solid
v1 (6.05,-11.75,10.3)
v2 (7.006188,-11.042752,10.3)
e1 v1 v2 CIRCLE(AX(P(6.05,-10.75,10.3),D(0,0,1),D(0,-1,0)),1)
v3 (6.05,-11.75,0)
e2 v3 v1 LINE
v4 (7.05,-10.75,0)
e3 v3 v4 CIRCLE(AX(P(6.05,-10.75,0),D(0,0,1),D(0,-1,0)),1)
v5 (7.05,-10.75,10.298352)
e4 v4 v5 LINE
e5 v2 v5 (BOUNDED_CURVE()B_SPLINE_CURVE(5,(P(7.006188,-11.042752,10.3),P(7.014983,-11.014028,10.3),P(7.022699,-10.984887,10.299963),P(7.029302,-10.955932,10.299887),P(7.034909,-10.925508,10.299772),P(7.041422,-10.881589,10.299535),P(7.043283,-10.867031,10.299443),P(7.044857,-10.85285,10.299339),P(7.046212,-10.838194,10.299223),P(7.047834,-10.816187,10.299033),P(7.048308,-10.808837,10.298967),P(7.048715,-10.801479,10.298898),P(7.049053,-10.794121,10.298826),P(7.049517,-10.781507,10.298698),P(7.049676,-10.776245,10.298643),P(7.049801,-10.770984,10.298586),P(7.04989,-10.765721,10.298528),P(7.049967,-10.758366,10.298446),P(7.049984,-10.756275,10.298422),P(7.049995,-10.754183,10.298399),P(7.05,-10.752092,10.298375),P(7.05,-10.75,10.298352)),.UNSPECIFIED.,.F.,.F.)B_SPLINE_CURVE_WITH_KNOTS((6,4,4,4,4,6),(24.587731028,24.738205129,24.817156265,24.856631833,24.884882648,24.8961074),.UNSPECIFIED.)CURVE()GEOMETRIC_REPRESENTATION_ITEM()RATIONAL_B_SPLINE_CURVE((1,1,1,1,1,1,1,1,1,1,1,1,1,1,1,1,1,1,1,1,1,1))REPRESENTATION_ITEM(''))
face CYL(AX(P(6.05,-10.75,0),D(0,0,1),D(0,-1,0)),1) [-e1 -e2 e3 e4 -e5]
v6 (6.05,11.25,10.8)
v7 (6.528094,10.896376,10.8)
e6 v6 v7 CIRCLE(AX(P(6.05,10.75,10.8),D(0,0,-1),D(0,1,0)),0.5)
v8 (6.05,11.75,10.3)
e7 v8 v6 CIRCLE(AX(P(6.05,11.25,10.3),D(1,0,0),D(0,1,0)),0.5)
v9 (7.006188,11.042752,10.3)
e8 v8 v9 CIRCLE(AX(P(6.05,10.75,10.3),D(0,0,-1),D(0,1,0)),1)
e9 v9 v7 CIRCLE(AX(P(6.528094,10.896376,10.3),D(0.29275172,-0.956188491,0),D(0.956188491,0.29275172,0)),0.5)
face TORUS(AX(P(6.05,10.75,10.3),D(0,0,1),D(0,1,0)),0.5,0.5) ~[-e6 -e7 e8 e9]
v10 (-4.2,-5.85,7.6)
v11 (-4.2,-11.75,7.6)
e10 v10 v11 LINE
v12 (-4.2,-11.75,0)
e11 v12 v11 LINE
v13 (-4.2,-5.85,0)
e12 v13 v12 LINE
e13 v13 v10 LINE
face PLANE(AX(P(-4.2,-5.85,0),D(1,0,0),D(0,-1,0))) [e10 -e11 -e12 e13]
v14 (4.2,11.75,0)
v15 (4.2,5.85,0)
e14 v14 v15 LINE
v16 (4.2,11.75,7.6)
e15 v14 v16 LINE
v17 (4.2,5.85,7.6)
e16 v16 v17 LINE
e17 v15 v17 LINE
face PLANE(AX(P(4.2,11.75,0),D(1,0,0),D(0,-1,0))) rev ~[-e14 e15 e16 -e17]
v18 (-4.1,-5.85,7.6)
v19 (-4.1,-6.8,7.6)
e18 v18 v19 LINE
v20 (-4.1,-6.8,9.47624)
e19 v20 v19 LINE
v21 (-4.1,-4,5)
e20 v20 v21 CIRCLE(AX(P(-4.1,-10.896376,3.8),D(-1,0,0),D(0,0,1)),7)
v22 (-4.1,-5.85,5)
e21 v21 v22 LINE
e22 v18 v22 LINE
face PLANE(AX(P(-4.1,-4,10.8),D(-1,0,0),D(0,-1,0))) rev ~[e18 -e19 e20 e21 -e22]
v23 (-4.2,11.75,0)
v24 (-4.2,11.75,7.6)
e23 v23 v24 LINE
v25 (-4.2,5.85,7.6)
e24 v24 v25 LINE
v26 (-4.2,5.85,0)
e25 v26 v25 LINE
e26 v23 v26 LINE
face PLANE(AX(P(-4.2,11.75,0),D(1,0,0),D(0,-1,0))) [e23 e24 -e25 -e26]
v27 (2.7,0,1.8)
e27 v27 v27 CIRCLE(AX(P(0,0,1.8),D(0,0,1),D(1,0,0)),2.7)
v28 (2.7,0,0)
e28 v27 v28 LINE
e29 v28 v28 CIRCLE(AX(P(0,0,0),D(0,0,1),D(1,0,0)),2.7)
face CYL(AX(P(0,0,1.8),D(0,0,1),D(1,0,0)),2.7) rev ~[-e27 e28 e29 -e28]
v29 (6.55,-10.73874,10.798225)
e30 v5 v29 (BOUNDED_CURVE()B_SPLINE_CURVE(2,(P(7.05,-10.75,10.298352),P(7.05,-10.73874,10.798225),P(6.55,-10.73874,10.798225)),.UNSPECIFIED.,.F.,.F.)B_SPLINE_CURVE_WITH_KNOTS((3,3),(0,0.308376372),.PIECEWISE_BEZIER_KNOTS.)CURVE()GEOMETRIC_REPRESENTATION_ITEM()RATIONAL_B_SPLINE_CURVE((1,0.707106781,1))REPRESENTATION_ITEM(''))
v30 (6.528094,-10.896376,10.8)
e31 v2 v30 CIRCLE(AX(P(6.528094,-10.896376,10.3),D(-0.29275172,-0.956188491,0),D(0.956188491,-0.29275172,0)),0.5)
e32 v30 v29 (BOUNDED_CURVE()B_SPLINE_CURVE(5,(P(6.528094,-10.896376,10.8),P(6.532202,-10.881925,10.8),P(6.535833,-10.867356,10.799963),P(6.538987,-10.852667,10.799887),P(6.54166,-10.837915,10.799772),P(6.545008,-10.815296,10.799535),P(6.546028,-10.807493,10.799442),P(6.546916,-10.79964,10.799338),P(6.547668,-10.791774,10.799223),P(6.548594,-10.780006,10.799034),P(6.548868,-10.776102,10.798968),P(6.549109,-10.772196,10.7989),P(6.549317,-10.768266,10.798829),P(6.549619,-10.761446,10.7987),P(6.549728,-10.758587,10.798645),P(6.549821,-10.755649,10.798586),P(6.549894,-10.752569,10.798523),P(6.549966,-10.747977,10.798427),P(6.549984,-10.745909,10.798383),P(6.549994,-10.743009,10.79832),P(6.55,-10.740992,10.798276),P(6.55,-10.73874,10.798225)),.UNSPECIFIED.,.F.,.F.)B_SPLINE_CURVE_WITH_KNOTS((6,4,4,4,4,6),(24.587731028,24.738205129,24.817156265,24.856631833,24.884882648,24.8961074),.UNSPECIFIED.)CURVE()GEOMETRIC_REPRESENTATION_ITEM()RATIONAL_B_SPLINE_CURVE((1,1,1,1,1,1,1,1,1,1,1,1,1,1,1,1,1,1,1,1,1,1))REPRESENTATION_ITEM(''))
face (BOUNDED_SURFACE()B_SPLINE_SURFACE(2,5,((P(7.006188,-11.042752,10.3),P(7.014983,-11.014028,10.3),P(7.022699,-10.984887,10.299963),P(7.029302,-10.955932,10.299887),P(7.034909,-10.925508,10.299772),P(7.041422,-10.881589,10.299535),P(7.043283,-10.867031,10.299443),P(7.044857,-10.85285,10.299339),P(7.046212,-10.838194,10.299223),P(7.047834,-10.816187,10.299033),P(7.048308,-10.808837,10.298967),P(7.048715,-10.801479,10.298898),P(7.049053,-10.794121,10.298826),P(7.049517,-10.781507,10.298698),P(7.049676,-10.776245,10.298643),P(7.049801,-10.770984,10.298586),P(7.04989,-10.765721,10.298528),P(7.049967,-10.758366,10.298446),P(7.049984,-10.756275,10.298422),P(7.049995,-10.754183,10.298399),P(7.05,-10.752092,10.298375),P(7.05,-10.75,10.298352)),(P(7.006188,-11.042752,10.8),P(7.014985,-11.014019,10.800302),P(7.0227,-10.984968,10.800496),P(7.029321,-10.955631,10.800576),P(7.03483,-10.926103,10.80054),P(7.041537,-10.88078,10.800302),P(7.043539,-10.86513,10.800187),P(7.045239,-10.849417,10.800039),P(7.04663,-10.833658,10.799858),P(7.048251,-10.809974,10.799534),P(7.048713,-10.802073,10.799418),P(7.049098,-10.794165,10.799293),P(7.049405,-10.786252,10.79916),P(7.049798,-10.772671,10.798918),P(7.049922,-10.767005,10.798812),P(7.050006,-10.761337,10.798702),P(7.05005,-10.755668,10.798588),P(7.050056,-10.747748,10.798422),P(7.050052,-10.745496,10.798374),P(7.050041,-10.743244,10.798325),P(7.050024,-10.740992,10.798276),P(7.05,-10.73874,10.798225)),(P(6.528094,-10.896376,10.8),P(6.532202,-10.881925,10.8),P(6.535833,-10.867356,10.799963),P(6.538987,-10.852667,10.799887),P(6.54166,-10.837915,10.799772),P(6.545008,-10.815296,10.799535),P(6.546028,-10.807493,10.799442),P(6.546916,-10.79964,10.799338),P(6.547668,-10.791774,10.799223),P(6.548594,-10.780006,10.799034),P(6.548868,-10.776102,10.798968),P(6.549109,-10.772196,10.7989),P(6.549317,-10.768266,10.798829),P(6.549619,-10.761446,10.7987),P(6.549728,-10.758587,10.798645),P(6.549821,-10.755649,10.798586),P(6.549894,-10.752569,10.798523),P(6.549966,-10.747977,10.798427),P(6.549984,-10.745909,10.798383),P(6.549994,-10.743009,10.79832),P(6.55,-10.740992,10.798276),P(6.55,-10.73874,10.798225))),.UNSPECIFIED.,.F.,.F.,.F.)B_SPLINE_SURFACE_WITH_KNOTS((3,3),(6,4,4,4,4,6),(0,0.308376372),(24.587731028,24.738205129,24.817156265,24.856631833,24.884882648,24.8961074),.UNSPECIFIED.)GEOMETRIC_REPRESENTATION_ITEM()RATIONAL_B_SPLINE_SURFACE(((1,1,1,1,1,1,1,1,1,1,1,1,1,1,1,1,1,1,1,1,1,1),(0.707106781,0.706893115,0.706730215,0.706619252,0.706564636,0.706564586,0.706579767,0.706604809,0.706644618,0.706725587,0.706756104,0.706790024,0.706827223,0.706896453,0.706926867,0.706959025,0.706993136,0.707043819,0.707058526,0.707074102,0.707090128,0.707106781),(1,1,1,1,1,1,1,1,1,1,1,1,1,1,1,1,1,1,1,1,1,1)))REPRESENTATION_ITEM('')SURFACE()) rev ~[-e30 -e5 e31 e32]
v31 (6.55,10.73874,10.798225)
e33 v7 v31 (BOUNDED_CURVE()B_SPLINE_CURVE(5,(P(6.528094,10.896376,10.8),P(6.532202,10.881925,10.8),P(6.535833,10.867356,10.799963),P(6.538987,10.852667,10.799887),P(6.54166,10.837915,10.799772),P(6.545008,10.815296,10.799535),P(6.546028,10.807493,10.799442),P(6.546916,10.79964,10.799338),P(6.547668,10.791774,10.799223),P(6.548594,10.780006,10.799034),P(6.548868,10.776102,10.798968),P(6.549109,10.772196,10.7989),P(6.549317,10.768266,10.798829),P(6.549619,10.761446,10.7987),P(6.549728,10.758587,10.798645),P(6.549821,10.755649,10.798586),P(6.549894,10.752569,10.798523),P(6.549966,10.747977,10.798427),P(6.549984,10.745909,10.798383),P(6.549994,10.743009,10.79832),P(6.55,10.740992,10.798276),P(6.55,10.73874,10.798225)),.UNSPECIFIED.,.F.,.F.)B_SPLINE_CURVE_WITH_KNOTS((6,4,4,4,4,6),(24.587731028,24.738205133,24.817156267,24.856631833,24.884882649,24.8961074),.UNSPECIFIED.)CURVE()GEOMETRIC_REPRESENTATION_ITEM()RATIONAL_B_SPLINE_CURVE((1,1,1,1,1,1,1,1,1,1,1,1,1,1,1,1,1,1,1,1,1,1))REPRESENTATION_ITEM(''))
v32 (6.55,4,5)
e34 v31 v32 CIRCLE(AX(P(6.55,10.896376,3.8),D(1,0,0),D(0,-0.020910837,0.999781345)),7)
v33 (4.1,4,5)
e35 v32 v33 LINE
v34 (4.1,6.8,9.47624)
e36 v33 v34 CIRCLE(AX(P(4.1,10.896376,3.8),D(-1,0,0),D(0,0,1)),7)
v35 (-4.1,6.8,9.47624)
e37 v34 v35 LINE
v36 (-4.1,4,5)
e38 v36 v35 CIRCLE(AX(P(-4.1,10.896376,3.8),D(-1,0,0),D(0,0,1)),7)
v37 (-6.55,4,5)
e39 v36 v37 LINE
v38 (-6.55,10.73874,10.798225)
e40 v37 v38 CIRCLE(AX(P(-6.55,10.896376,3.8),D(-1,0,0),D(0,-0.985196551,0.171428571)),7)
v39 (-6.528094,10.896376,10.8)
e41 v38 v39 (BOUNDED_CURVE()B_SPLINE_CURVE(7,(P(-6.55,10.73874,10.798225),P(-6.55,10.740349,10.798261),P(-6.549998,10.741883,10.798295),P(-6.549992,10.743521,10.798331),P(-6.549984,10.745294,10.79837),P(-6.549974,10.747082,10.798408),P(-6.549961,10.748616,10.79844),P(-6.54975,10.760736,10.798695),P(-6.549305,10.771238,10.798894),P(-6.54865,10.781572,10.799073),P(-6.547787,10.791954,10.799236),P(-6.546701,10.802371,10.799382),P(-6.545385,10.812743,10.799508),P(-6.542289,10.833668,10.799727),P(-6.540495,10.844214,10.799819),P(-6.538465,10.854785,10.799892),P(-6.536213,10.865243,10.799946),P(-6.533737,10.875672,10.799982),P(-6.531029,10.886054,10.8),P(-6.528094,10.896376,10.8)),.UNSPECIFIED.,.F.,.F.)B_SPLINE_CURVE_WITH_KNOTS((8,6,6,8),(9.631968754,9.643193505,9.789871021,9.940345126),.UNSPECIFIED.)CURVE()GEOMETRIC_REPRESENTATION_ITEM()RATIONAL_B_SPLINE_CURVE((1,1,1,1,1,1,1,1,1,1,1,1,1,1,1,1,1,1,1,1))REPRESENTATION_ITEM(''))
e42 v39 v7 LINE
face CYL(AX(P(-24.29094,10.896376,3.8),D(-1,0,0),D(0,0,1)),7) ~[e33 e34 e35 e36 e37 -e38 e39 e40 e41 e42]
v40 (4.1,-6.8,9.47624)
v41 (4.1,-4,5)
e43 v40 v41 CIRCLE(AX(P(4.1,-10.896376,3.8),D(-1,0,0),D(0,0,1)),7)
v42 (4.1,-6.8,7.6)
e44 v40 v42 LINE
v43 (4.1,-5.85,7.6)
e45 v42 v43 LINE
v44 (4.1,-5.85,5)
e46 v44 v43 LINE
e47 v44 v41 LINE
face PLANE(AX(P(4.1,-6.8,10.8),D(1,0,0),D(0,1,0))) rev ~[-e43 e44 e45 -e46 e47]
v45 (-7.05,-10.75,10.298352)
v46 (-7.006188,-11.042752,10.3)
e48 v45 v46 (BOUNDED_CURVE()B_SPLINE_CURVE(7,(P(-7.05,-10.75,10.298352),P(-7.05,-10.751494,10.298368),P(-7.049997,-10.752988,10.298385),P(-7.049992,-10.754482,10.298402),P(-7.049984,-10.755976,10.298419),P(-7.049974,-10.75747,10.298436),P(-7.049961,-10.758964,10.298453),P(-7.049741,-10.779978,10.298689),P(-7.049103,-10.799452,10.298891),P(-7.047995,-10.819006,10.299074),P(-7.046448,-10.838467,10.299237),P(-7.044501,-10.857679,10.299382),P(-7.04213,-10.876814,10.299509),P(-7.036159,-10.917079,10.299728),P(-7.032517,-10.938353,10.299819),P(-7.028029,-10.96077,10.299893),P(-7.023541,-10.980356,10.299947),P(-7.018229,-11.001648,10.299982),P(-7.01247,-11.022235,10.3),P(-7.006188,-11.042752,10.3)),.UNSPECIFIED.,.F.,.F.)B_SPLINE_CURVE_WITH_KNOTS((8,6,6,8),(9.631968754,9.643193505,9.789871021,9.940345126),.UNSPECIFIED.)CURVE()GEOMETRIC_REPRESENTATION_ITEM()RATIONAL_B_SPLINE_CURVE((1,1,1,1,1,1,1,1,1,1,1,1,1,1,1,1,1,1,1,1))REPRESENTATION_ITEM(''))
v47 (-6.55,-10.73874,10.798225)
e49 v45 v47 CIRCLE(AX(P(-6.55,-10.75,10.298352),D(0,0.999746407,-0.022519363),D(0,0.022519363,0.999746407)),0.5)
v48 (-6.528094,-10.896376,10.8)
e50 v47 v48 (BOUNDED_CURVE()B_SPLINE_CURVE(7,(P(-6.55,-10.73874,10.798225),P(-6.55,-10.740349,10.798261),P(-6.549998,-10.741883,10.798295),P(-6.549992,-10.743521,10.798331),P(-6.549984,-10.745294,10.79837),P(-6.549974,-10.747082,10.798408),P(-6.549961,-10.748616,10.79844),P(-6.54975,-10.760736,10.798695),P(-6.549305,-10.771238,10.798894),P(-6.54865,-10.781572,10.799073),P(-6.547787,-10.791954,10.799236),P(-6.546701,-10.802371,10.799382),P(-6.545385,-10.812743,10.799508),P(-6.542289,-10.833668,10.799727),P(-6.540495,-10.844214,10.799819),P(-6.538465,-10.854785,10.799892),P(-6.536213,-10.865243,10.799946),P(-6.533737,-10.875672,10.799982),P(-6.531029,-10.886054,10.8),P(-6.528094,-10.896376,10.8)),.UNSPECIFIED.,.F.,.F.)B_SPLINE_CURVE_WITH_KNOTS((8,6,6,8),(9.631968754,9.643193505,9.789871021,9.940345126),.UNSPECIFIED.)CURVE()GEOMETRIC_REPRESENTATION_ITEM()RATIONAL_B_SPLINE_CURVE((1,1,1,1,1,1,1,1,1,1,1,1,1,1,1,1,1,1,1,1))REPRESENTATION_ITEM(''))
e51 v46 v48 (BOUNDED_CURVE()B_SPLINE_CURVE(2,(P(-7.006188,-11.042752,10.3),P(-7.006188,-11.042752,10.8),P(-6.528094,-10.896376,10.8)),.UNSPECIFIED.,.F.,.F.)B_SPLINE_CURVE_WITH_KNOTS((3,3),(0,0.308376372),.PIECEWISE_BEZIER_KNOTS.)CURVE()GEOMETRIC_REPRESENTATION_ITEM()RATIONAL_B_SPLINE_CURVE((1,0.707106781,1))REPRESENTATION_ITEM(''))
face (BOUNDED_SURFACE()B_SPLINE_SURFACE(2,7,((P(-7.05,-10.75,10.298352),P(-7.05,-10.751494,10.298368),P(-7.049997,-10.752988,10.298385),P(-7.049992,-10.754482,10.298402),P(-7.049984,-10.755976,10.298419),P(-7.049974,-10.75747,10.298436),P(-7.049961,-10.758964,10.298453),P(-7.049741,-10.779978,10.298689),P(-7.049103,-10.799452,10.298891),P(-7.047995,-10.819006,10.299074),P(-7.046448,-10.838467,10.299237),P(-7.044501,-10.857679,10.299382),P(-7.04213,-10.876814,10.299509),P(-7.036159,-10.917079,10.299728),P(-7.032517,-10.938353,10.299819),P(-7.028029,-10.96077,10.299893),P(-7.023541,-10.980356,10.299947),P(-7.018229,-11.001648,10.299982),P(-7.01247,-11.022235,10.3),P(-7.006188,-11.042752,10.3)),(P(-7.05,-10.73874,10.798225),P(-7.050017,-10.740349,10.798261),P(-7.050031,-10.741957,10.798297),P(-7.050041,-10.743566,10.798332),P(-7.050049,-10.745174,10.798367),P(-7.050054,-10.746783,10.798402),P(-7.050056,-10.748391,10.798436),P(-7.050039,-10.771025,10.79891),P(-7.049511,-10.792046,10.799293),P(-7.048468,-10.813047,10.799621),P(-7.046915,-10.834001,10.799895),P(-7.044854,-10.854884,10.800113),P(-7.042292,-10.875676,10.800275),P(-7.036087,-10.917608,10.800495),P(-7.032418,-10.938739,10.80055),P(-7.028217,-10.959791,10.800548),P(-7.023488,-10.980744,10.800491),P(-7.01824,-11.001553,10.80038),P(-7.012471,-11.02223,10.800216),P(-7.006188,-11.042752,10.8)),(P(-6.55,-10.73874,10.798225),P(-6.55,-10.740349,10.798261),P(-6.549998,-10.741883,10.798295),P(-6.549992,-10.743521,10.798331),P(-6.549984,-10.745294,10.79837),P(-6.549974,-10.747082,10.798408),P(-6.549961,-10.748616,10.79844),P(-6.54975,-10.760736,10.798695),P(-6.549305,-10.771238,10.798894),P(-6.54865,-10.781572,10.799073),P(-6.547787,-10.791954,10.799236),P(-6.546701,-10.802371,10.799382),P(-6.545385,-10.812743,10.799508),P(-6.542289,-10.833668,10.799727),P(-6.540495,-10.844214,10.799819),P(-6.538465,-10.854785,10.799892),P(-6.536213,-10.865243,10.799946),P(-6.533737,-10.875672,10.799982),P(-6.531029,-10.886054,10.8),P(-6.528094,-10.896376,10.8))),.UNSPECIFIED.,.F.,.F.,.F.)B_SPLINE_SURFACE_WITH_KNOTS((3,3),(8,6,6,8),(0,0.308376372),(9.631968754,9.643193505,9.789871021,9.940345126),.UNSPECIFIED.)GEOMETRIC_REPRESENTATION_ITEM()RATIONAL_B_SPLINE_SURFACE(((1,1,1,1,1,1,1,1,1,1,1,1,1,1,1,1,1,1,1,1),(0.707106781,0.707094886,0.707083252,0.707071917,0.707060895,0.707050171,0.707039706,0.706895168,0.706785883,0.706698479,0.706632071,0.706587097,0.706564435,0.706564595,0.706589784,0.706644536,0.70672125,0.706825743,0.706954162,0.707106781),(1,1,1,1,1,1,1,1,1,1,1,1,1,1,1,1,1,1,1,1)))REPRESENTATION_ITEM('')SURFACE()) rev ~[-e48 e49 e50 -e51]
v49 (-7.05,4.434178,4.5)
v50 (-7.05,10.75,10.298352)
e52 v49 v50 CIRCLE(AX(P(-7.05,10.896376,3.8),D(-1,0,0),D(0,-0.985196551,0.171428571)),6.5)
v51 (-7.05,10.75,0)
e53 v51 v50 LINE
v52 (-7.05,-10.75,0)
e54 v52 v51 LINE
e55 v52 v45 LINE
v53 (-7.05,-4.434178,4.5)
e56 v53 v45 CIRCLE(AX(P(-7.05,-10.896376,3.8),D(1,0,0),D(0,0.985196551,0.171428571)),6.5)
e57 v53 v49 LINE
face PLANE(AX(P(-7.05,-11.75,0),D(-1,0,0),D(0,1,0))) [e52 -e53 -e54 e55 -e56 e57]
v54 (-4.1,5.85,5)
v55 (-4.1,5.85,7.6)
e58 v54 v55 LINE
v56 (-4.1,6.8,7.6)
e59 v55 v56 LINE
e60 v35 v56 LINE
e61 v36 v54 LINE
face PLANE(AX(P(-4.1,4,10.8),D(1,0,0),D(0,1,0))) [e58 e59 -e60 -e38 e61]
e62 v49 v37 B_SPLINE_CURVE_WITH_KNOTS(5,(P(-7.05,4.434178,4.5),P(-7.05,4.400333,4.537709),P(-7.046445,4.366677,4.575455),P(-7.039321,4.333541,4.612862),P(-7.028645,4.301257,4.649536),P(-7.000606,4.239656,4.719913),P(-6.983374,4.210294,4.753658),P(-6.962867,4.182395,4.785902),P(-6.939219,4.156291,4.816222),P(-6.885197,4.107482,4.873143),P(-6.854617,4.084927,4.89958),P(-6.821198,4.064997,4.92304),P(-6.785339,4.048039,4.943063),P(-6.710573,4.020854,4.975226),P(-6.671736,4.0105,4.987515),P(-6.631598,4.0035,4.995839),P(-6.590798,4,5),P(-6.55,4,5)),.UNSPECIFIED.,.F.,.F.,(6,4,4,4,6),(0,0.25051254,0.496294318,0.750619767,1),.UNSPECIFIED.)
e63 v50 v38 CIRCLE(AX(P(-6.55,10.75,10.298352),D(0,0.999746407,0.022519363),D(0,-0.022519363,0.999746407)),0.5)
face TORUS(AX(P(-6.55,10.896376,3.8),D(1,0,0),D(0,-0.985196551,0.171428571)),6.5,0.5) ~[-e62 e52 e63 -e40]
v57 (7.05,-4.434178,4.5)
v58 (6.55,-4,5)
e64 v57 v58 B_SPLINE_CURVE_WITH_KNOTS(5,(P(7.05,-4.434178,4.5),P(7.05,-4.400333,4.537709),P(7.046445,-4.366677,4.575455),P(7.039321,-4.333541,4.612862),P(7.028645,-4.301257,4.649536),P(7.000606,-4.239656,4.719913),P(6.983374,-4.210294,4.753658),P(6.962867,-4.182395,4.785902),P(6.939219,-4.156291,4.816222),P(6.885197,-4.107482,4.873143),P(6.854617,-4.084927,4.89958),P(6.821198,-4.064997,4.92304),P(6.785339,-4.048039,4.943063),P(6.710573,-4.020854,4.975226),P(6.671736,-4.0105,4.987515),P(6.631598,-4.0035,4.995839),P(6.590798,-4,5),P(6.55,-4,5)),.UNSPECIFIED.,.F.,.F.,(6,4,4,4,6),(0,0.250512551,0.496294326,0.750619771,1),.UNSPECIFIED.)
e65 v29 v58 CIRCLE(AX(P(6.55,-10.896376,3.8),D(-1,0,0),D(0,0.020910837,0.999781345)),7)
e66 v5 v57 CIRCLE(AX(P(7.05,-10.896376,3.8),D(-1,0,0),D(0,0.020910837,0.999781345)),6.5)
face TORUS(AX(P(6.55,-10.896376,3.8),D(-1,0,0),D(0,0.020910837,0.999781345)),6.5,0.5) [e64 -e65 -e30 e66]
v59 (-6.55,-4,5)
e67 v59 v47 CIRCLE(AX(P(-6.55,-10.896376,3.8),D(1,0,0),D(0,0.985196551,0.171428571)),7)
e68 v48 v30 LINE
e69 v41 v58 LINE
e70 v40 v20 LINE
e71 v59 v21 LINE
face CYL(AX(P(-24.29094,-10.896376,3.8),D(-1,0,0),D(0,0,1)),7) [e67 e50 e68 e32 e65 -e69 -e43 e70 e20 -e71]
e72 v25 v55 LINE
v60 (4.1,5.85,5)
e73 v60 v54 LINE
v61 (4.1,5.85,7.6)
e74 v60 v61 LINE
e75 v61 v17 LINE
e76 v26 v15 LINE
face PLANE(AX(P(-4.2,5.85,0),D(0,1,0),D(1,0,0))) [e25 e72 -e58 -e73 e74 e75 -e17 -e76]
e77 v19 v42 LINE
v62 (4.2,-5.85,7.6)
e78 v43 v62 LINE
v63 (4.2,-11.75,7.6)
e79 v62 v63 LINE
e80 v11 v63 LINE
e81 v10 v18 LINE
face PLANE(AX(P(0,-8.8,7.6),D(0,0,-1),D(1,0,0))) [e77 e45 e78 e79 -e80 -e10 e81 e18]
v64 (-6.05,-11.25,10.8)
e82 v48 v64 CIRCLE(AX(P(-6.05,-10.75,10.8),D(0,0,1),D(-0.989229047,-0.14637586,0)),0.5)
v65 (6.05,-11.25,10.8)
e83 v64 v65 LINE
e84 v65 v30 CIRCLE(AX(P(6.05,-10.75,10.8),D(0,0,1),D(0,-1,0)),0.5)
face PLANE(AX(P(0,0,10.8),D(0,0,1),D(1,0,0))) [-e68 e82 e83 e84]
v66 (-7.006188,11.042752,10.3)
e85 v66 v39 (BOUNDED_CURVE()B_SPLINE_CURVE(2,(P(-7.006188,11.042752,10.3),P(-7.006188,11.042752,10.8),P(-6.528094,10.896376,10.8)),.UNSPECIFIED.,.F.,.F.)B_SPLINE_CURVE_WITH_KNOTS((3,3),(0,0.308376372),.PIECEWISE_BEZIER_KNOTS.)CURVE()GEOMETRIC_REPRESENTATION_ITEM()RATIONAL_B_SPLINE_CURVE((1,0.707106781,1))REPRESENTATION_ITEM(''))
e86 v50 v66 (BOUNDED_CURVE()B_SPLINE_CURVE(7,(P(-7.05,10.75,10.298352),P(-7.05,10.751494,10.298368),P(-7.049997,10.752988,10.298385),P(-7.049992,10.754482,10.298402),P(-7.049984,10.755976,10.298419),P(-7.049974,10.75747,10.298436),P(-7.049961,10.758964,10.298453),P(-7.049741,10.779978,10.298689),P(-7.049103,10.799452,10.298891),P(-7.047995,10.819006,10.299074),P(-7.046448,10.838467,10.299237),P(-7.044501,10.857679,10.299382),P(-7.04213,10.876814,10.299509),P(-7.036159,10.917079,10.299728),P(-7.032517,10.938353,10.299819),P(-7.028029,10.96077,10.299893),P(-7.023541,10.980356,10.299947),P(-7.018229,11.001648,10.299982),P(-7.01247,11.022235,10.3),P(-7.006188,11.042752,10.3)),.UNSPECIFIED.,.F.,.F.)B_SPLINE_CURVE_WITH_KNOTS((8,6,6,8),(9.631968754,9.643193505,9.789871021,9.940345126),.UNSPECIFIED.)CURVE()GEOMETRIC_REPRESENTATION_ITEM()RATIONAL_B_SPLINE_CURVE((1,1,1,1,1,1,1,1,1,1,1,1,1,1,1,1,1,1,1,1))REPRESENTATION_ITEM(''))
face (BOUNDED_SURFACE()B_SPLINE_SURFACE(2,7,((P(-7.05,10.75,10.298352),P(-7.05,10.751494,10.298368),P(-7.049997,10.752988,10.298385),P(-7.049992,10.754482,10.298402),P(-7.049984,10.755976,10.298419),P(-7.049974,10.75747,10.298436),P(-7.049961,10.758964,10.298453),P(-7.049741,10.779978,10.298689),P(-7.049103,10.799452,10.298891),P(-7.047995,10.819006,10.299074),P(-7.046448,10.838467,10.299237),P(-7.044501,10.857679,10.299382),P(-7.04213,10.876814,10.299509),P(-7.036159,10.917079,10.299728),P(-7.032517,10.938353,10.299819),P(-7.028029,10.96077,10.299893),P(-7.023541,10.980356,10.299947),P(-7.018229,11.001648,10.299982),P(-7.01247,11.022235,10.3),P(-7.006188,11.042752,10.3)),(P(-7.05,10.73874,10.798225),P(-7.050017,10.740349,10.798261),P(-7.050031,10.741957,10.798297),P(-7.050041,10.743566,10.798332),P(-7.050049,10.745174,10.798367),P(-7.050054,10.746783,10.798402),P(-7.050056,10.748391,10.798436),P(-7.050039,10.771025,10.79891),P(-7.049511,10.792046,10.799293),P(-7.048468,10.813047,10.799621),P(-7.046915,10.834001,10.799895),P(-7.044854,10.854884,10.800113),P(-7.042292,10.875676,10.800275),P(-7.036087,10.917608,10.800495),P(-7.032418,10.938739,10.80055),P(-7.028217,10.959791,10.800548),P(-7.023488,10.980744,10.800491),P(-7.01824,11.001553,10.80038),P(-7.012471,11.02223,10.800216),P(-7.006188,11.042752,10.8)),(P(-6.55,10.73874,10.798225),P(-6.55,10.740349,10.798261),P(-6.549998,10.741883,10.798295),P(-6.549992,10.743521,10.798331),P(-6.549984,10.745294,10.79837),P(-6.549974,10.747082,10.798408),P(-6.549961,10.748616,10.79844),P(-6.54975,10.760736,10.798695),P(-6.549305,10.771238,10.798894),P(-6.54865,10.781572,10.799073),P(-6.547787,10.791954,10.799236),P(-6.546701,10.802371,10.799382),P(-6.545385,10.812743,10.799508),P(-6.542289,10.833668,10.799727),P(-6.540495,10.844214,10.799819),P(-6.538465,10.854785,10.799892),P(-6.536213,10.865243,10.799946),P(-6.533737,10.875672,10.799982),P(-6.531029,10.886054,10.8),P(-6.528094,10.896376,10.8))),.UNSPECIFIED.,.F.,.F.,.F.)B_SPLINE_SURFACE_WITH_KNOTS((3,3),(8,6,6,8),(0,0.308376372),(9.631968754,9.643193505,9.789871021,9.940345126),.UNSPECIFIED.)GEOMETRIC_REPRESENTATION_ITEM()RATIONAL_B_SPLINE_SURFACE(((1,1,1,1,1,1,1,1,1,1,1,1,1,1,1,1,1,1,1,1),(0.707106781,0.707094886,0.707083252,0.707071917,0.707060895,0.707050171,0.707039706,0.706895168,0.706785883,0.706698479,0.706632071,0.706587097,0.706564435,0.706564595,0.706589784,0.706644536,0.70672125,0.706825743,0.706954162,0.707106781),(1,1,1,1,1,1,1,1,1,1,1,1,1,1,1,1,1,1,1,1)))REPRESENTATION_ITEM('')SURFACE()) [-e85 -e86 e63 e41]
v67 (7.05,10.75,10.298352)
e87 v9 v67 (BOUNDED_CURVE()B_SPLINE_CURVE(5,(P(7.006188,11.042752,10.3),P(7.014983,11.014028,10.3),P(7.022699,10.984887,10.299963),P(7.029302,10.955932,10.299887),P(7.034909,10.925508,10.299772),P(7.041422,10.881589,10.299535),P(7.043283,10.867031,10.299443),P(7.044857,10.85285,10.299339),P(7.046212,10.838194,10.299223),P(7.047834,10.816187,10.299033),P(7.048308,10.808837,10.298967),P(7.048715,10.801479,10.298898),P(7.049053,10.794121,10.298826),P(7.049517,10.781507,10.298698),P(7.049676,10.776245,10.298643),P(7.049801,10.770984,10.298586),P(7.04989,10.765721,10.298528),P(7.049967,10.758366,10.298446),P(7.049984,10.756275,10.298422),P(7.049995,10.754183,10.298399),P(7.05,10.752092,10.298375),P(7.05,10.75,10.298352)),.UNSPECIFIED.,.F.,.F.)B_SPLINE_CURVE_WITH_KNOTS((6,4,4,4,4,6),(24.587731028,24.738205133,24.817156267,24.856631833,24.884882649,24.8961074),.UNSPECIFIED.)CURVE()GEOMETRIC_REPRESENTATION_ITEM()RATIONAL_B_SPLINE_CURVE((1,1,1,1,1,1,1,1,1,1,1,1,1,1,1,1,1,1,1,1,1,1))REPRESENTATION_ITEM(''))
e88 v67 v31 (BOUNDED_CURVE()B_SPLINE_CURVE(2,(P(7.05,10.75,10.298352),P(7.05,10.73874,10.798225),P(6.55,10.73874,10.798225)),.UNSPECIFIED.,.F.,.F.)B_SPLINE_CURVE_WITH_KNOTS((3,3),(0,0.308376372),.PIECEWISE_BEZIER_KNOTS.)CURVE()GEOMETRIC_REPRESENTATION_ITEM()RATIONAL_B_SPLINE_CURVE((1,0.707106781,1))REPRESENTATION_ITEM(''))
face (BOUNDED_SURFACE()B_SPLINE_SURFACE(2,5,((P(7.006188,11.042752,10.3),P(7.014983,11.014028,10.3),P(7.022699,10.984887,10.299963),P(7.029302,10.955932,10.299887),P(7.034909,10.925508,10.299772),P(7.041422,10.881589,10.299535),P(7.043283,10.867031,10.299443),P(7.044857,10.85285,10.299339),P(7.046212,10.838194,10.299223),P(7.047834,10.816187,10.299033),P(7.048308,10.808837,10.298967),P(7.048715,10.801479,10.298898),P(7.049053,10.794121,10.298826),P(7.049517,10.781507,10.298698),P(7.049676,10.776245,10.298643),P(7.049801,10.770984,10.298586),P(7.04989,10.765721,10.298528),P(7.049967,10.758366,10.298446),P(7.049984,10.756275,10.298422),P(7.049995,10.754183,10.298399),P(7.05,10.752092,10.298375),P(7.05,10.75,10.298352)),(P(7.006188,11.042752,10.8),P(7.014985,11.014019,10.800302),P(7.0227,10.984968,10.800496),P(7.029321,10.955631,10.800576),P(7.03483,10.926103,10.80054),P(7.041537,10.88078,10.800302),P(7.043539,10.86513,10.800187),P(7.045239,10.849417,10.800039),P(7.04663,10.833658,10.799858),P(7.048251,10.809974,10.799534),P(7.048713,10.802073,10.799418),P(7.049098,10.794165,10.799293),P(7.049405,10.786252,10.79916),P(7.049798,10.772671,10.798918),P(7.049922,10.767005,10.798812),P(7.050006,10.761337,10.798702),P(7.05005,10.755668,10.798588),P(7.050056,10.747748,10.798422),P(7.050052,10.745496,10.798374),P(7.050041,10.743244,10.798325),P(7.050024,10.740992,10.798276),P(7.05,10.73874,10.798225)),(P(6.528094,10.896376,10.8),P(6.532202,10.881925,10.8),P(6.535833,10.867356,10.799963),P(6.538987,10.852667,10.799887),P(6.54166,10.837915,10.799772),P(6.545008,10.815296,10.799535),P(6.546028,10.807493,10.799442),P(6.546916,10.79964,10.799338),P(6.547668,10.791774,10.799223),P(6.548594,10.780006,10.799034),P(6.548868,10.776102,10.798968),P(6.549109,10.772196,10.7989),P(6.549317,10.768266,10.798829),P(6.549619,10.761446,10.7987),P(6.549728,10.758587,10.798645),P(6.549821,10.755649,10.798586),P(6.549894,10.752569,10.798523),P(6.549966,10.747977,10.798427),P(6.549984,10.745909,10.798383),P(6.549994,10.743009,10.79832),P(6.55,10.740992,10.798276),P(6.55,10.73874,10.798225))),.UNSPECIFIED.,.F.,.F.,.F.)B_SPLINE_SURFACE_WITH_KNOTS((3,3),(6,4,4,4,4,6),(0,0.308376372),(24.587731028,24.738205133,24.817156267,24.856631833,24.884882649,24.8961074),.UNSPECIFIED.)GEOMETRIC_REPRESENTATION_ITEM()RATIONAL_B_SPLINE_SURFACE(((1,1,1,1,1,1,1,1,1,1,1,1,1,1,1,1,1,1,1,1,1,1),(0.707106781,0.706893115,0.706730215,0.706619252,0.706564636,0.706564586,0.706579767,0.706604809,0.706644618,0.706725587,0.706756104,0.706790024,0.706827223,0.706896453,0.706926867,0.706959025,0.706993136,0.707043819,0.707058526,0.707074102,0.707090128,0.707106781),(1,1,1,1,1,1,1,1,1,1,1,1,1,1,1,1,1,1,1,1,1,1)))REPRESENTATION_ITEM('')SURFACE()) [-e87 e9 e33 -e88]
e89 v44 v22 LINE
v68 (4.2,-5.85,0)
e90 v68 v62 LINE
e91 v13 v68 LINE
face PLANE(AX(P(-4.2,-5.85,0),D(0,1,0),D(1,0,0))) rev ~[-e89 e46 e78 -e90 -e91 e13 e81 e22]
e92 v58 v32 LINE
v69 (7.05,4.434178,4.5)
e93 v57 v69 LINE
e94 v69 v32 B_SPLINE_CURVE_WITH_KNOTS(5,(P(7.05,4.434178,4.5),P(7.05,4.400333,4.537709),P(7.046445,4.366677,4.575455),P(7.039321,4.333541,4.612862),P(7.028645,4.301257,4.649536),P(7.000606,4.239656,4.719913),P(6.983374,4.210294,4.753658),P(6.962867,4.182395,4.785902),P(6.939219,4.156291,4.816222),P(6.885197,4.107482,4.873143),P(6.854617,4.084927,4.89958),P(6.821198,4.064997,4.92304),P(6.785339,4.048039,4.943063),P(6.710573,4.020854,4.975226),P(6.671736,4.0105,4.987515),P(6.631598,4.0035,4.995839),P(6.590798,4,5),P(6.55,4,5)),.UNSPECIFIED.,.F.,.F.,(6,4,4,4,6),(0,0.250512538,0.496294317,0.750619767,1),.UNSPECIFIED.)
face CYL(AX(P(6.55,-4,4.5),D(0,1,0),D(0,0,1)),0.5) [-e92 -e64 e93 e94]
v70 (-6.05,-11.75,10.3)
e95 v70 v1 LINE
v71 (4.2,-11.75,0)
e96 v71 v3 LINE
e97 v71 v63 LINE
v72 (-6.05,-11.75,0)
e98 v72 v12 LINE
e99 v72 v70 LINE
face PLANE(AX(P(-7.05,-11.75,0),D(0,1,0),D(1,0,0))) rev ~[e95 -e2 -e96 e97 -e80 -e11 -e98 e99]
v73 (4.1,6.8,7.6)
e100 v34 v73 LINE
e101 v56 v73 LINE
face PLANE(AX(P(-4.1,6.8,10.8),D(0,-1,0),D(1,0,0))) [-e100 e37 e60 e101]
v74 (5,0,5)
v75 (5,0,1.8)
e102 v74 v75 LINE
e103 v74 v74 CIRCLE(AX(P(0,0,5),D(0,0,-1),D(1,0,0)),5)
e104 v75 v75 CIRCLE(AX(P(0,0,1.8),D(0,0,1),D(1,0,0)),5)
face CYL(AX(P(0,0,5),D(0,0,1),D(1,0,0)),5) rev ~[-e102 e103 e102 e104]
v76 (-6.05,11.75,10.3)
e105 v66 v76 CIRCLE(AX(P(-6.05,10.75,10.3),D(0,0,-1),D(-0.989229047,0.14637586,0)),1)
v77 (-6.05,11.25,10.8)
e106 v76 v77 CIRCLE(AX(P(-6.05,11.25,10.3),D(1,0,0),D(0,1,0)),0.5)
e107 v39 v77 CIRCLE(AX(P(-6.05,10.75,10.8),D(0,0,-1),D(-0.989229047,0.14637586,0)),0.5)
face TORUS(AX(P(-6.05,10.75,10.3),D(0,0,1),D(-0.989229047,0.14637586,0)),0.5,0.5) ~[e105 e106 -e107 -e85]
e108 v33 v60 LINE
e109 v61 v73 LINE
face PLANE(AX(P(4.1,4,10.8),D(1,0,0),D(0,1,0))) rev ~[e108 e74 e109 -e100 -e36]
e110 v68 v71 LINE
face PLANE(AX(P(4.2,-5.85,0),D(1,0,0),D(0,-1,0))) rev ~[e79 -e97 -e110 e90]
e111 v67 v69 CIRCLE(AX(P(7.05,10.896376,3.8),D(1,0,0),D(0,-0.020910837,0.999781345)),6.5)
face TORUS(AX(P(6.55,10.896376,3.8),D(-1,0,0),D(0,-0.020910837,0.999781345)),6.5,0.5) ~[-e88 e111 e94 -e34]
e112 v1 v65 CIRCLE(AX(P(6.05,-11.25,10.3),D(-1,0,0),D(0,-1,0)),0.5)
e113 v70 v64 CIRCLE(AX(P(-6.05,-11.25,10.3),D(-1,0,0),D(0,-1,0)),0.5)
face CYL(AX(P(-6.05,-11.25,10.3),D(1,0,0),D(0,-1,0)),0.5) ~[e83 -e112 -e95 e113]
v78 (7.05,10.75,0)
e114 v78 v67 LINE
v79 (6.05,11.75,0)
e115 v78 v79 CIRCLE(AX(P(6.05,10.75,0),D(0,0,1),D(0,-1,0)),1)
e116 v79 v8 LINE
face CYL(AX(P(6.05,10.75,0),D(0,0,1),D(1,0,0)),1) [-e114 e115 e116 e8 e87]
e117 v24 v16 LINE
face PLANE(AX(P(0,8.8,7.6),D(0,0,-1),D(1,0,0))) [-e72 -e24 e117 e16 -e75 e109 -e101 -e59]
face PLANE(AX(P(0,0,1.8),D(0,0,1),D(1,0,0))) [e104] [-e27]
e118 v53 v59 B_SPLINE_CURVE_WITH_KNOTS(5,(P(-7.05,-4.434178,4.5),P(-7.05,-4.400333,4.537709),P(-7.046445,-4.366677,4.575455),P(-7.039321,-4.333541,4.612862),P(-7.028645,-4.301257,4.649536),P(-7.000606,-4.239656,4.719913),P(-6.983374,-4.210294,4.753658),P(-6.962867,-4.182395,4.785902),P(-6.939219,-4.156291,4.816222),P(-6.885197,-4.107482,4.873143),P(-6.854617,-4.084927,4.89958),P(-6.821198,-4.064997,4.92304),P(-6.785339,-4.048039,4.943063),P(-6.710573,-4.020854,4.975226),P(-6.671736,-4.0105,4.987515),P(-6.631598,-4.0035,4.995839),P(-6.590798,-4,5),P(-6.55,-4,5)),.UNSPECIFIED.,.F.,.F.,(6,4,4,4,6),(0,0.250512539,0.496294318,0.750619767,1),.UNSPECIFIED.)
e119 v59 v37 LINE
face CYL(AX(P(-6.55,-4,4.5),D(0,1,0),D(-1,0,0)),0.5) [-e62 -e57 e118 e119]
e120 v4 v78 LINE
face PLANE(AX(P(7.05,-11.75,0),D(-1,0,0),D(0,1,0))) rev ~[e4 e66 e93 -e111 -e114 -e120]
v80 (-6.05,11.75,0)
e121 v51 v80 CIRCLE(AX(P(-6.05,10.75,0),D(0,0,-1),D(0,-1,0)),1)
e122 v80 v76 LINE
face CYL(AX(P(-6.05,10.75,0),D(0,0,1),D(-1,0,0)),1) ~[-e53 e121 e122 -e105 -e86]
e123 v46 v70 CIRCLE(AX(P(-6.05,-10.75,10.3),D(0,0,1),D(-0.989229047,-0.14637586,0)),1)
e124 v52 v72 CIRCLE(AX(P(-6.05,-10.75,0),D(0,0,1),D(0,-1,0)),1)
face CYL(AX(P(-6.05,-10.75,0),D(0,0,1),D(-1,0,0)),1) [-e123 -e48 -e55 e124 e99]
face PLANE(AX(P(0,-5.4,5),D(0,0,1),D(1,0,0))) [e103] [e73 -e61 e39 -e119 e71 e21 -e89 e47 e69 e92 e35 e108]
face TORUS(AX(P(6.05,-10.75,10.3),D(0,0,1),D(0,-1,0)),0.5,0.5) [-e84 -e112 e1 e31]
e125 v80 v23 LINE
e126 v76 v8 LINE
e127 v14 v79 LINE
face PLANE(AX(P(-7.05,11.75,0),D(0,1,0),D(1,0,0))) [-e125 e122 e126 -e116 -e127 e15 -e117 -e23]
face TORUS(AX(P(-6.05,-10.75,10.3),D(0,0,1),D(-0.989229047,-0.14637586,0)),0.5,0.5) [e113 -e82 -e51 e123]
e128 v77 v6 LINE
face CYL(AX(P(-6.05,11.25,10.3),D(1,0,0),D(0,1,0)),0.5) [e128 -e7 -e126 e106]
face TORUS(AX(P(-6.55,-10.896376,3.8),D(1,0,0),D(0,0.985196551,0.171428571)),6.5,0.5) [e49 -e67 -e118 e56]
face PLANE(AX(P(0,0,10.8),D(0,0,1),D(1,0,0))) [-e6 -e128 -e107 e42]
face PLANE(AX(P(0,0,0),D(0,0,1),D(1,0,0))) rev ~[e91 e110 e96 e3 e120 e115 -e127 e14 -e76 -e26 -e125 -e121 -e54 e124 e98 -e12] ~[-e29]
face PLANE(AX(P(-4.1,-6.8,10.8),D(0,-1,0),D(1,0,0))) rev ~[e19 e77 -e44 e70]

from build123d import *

# Parameters (mm, degrees)
F0_W         = 14.1
F0_H         = 23.5
F1_DEPTH     = 10.8
F2_W         = 8.2
F2_H         = 2.8
F2_H_2       = 8
F2_W_2       = 2.95
F3_DEPTH     = 5.8
F4_W         = 8.4
F4_H         = 5.9
F5_DEPTH     = 7.6
F6_R         = 5
F7_DEPTH     = 3.2
F8_R         = 2.7
F9_DEPTH     = 1.801
F10_T1_DEPTH = 37.4318792991
F11_R        = 1
F12_R        = 0.5


# Not quite as in the source:
# - a fillet or chamfer that OpenCascade refuses, or shapes differently, is made with other operations: its cross-section is extruded or revolved along the edge and cut away or added


with BuildPart() as f1:
    # F0 (on Top) → F1 (new body)
    with BuildSketch(Plane.XY):
        Rectangle(F0_W, F0_H)
    extrude(amount=F1_DEPTH)

    # F2 (on face) → F3 (cut)
    with BuildSketch(Plane.XY.offset(10.8)):
        with Locations((0, -5.4)):
            Rectangle(F2_W, F2_H)
        Rectangle(F2_W, F2_H_2)
        with Locations((5.575, 0)):
            Rectangle(F2_W_2, F2_H_2)
        with Locations((-5.575, 0)):
            Rectangle(F2_W_2, F2_H_2)
        with Locations((0, 5.4)):
            Rectangle(F2_W, F2_H)
    extrude(amount=-F3_DEPTH, mode=Mode.SUBTRACT)

    # F4 (on face) → F5 (cut)
    with BuildSketch(Plane(origin=(0, 0, 0), x_dir=(1, 0, 0), z_dir=(0, 0, -1))):
        with Locations((0, -8.8)):
            Rectangle(F4_W, F4_H)
        with Locations((0, 8.8)):
            Rectangle(F4_W, F4_H)
    extrude(amount=-F5_DEPTH, mode=Mode.SUBTRACT)

    # F6 (on face) → F7 (cut)
    with BuildSketch(Plane.XY.offset(5)):
        Circle(F6_R)
    extrude(amount=-F7_DEPTH, mode=Mode.SUBTRACT)

    # F8 (on face) → F9 (cut, through all)
    with BuildSketch(Plane.XY.offset(1.8)):
        Circle(F8_R)
    extrude(amount=-F9_DEPTH, mode=Mode.SUBTRACT)

    # F10: fillet of radius 7 on 2 edges, made by hand

    # F10_s2 → F10_t1 (cut)
    with BuildSketch(Plane.YZ.offset(-24.2909396496)):
        with BuildLine():
            ThreePointArc((-10.8963758598, 10.8), (-6.3908237294, 9.1572380944), (-4, 5))
            Line((-4, 5), (-4, 10.8))
            Line((-4, 10.8), (-10.8963758598, 10.8))
        make_face()
        with BuildLine():
            ThreePointArc((10.8963758598, 10.8), (6.3908237294, 9.1572380944), (4, 5))
            Line((4, 5), (4, 10.8))
            Line((4, 10.8), (10.8963758598, 10.8))
        make_face()
    extrude(amount=F10_T1_DEPTH, mode=Mode.SUBTRACT)

    # F11
    f11_edges = [f1.edges().sort_by_distance(p)[0] for p in [
        (7.05, -11.75, 5.4),
        (-7.05, -11.75, 5.4),
        (7.05, 11.75, 5.4),
        (-7.05, 11.75, 5.4),
    ]]
    fillet(f11_edges, radius=F11_R)

    # F12
    f12_edges = [f1.edges().sort_by_distance(p)[0] for p in [
        (0, 11.75, 10.8),
        (0, -11.75, 10.8),
        (-7.05, 0, 5),
        (7.05, 0, 5),
        (7.05, -6.335055, 9.109835),
        (7.05, 6.335055, 9.109835),
        (7.047304, -10.823382, 10.79962),
        (6.703309, -11.507092, 10.8),
        (7.047304, 10.823382, 10.79962),
        (6.703309, 11.507092, 10.8),
        (-7.05, -6.335055, 9.109835),
        (-7.047304, -10.823382, 10.799619),
        (-7.05, 6.335055, 9.109835),
        (-7.047304, 10.823382, 10.79962),
        (-6.703309, -11.507092, 10.8),
        (-6.703309, 11.507092, 10.8),
    ]]
    fillet(f12_edges, radius=F12_R)


solid = f1.part
